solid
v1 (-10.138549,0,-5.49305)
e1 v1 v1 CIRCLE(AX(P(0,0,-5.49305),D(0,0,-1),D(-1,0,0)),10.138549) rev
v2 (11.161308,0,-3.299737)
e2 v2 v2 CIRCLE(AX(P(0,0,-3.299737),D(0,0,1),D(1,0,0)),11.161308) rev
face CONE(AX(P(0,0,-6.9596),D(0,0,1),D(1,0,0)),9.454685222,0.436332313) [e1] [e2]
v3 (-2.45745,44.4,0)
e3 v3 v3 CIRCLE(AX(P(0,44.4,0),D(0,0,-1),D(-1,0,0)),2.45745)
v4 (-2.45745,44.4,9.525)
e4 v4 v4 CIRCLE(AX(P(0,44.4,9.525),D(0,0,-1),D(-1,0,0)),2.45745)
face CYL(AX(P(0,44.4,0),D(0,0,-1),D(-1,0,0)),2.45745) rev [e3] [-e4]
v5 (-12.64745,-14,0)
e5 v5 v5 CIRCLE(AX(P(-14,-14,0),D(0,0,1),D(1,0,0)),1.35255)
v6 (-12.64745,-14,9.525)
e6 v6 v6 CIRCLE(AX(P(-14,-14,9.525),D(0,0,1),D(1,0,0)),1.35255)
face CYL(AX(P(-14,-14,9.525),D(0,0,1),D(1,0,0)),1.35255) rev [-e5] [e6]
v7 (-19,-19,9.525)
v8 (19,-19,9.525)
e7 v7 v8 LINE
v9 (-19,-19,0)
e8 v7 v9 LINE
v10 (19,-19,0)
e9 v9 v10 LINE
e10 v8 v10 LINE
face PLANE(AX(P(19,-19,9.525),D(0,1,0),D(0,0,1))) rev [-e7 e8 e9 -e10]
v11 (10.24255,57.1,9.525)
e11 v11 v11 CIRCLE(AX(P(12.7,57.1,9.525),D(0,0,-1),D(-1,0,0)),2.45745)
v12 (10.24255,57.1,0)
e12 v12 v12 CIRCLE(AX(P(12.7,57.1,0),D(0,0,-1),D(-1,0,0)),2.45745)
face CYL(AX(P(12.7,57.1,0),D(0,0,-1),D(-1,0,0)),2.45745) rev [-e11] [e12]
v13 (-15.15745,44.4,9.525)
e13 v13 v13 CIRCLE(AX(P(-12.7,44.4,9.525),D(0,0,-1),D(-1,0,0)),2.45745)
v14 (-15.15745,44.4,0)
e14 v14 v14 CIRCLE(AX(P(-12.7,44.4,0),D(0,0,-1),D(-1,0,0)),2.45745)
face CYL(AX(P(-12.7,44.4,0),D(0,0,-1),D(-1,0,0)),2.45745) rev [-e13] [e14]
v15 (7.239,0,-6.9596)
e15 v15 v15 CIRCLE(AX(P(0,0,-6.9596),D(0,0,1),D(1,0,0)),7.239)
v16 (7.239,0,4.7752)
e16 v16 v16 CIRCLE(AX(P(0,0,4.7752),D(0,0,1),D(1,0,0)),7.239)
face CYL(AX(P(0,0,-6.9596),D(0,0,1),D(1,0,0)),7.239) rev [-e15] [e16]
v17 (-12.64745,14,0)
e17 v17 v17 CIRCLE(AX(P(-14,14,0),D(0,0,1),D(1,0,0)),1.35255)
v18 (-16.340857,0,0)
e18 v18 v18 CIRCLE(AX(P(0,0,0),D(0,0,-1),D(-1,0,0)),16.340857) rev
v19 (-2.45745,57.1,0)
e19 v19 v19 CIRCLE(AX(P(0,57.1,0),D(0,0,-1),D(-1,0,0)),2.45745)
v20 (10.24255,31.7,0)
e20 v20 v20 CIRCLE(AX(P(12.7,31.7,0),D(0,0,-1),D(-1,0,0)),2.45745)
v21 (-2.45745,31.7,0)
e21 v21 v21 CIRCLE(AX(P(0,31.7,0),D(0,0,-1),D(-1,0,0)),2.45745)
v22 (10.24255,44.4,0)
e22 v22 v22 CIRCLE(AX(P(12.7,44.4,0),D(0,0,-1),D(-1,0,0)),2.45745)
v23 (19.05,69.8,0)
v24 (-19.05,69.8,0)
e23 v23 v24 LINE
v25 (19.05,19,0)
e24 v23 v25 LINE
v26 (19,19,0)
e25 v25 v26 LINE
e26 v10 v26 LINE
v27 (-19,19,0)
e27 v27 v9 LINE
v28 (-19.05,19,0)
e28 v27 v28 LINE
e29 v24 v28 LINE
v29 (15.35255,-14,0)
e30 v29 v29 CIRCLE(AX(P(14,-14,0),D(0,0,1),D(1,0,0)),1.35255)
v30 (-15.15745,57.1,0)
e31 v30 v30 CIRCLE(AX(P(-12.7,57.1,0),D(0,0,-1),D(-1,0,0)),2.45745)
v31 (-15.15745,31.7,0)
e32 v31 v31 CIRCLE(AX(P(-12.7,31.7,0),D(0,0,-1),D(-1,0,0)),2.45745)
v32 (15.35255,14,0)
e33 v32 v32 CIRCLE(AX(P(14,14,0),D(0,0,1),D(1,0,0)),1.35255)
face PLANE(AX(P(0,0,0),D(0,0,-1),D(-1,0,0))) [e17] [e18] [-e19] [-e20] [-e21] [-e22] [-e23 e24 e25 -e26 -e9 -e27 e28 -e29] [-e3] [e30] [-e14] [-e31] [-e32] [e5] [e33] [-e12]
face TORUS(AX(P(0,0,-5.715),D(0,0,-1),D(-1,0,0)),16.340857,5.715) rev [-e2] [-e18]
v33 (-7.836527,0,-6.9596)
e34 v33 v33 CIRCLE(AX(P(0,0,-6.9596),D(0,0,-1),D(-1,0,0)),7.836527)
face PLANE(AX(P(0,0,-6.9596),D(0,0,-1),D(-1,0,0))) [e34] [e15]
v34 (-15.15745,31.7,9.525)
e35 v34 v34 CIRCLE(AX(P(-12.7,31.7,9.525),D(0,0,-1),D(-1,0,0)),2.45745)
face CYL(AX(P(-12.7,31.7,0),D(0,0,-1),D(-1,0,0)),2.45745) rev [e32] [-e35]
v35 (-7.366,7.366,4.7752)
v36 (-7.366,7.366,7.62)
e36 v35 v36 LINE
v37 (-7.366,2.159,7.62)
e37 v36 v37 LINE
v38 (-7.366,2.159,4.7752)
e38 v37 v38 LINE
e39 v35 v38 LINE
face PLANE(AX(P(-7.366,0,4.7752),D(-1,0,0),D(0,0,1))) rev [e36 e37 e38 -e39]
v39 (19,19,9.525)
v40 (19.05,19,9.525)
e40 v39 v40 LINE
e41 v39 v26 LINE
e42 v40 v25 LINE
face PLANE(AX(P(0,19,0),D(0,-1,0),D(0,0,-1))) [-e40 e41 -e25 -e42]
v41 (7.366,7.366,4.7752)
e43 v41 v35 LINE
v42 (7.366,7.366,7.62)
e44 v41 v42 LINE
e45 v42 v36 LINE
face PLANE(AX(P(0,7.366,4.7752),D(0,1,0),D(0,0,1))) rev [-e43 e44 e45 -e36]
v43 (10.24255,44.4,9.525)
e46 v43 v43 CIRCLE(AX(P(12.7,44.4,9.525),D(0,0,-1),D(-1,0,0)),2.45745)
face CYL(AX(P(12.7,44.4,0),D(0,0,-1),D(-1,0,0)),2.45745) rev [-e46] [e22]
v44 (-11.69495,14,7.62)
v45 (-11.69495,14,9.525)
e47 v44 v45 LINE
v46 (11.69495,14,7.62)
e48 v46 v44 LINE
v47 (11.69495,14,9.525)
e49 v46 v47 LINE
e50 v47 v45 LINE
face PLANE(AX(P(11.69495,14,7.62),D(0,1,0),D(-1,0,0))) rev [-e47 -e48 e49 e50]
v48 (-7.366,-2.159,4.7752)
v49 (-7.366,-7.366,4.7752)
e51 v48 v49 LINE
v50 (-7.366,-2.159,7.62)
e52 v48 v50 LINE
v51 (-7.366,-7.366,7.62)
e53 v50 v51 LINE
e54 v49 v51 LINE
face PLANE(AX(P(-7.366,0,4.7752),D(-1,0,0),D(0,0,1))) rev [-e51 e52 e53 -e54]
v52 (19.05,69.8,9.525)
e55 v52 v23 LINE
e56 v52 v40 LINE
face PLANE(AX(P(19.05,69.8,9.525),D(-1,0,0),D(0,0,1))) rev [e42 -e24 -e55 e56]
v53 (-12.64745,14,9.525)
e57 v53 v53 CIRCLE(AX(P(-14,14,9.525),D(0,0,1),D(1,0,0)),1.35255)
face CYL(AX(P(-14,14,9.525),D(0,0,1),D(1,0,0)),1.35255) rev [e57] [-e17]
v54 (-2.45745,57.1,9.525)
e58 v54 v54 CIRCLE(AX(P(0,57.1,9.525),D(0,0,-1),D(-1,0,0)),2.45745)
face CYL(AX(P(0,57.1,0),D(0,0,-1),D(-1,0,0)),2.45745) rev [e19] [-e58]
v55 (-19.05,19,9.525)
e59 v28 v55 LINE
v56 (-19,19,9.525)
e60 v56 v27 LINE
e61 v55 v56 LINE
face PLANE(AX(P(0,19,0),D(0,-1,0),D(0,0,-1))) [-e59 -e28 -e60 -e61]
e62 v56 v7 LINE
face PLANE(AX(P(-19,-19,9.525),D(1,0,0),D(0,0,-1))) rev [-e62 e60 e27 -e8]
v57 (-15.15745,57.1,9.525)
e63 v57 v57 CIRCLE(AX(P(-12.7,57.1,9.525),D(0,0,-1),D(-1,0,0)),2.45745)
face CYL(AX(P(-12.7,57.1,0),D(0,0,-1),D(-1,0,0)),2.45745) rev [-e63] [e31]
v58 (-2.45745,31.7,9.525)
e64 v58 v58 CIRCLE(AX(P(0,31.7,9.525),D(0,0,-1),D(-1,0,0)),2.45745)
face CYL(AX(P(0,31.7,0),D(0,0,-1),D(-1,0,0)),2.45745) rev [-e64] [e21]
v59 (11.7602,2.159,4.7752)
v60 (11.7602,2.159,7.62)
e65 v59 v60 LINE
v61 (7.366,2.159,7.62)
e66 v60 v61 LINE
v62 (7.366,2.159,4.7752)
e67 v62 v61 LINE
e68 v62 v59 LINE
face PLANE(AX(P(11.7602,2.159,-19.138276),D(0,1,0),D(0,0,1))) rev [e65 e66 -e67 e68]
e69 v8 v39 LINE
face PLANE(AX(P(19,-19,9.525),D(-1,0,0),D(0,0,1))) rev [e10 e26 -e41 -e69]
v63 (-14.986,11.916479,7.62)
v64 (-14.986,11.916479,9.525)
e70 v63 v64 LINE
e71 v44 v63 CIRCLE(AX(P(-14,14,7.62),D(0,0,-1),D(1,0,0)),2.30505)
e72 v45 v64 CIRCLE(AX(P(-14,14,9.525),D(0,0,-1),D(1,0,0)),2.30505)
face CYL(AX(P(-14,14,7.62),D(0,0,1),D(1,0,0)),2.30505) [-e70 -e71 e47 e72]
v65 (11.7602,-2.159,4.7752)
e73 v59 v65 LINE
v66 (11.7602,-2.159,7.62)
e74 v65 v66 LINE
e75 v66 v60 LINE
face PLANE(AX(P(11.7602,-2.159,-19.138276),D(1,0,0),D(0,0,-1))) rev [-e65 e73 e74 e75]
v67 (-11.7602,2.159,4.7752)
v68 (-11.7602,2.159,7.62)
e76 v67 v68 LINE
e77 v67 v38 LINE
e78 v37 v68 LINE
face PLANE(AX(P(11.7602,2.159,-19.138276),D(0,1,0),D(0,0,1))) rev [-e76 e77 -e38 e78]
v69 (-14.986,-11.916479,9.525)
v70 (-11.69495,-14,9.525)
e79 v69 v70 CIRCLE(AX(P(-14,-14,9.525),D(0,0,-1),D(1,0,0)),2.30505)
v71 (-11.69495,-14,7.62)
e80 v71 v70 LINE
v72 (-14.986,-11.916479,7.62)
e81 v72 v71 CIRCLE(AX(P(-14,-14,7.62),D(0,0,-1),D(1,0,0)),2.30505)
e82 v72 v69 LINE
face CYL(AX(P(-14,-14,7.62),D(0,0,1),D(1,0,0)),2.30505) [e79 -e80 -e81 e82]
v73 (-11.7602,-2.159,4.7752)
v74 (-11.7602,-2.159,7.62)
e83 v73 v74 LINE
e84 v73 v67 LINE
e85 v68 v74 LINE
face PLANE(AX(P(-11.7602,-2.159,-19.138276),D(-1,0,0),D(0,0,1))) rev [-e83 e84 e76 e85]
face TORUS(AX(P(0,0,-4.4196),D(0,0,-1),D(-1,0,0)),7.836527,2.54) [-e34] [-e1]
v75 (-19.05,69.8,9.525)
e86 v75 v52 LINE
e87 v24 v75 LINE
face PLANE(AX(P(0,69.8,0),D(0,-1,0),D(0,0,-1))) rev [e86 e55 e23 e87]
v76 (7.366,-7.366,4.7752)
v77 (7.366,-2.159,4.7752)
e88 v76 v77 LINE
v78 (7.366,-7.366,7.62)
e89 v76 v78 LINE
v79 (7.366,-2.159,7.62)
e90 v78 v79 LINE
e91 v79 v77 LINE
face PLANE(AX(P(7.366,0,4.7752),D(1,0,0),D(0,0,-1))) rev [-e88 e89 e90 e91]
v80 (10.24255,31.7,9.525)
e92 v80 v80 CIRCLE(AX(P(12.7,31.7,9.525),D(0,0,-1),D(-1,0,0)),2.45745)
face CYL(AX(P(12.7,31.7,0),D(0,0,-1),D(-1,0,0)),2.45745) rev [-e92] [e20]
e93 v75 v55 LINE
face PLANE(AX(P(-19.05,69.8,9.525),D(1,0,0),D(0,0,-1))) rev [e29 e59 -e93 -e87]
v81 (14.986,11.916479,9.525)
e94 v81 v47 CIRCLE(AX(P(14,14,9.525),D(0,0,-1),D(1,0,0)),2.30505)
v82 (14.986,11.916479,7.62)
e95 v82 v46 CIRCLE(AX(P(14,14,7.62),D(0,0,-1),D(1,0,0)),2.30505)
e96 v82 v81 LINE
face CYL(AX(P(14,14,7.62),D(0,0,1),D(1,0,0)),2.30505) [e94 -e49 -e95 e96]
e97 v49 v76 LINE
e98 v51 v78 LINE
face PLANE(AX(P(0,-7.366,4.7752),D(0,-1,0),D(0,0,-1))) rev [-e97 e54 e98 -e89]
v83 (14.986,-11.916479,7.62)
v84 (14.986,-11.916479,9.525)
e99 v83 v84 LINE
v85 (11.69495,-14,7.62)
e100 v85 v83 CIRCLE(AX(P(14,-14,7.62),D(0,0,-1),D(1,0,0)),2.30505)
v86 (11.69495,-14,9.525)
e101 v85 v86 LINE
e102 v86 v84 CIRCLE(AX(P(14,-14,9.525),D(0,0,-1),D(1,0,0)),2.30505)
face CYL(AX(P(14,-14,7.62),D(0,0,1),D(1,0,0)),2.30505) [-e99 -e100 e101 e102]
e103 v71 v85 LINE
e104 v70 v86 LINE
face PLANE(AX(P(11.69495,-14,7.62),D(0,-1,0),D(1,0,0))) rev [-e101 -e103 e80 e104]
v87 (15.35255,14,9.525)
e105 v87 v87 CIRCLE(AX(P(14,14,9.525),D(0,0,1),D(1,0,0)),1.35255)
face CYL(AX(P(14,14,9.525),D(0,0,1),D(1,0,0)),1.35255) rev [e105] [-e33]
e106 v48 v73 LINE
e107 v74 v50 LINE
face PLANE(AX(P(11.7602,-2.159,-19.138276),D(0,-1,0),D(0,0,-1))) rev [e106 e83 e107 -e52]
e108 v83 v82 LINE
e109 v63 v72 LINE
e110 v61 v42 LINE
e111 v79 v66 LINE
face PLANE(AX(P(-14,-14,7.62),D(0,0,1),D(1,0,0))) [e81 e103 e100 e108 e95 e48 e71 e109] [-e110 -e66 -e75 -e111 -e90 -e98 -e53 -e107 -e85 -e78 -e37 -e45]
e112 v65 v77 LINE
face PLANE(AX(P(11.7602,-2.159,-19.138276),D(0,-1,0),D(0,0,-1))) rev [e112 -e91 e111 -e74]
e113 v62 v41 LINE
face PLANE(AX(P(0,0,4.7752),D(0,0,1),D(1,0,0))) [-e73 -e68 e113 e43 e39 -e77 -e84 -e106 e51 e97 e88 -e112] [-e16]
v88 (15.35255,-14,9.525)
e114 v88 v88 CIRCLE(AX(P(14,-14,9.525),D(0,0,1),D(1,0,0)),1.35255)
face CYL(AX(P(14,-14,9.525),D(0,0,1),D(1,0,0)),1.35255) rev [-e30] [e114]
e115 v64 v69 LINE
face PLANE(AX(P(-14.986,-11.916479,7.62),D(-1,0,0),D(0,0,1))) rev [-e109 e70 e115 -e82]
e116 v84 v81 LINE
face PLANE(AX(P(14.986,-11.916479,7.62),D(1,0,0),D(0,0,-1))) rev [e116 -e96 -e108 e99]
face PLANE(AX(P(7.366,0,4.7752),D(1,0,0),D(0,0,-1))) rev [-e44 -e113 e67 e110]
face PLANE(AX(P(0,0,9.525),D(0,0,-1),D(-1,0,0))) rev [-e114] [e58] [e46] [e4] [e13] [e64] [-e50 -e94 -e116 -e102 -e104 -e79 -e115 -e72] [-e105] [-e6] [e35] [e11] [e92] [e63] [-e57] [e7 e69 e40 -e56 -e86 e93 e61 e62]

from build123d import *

# Parameters (mm, degrees)
SKETCH1_W                    = 38
SKETCH1_H                    = 38
BOSS_EXTRUDE1_DEPTH          = 9.525
F_36_0_1065_DIAMETER_HOLE2_D = 2.7051
SKETCH8_W                    = 38.1
SKETCH8_H                    = 9.525
BOSS_EXTRUDE2_DEPTH          = 50.8
F_10_0_1935_DIAMETER_HOLE1_D = 4.9149
CUT_EXTRUDE2_DEPTH           = 1.905
CUT_EXTRUDE4_START           = 1.905
SKETCH13_W                   = 14.732
SKETCH13_H                   = 14.732
CUT_EXTRUDE4_DEPTH           = 4.7498
SKETCH14_W                   = 23.5204
SKETCH14_H                   = 4.318
CUT_EXTRUDE5_DEPTH           = 2.8448
SKETCH15_R                   = 12.7
BOSS_EXTRUDE3_DEPTH          = 6.9596
SKETCH12_R                   = 7.239
CUT_EXTRUDE3_DEPTH           = 74.807230243
CHAMFER1_SIZE2               = 3.245314778
CHAMFER1_SIZE                = 6.9596
FILLET4_R                    = 2.54
LPATTERN1_COUNT              = 3
LPATTERN1_PITCH              = 12.7


with BuildPart() as part:
    # Sketch1 → Boss-Extrude1 (new body)
    with BuildSketch(Plane(origin=(0, 0, 0), x_dir=(0, 1, 0), z_dir=(0, 0, 1))):
        Rectangle(SKETCH1_W, SKETCH1_H)
    extrude(amount=BOSS_EXTRUDE1_DEPTH)

    # #36 (0.1065) Diameter Hole2 (through all)
    with Locations(Plane.XY.offset(9.525)):
        with Locations((-14, -14), (14, -14), (14, 14), (-14, 14)):
            Hole(F_36_0_1065_DIAMETER_HOLE2_D / 2)

    # Sketch8 → Boss-Extrude2 (add)
    with BuildSketch(Plane(origin=(0, 19, 0), x_dir=(-1, 0, 0), z_dir=(0, 1, 0))):
        with Locations((0, 4.7625)):
            Rectangle(SKETCH8_W, SKETCH8_H)
    extrude(amount=BOSS_EXTRUDE2_DEPTH)

    # #10 (0.1935) Diameter Hole1 (through all)
    with Locations(Plane(origin=(0, 0, 0), x_dir=(1, 0, 0), z_dir=(0, 0, -1))):
        with Locations((-12.7, -57.1), (0, -57.1), (12.7, -57.1), (25.4, -57.1), (38.1, -57.1)):
            f_10_0_1935_diameter_hole1 = Hole(F_10_0_1935_DIAMETER_HOLE1_D / 2)

    # Sketch11 → Cut-Extrude2 (cut)
    with BuildSketch(Plane.XY.offset(9.525)):
        with BuildLine():
            Line((11.69495, -14), (-11.69495, -14))
            ThreePointArc((-11.69495, -14), (-12.76702064, -12.052432953), (-14.986, -11.916479061))
            Line((-14.986, -11.916479061), (-14.986, 11.916479061))
            ThreePointArc((-14.986, 11.916479061), (-12.76702064, 12.052432953), (-11.69495, 14))
            Line((-11.69495, 14), (11.69495, 14))
            ThreePointArc((11.69495, 14), (12.76702064, 12.052432953), (14.986, 11.916479061))
            Line((14.986, 11.916479061), (14.986, -11.916479061))
            ThreePointArc((14.986, -11.916479061), (12.76702064, -12.052432953), (11.69495, -14))
        make_face()
    extrude(amount=-CUT_EXTRUDE2_DEPTH, mode=Mode.SUBTRACT)

    # Sketch13 → Cut-Extrude4 (cut)
    with BuildSketch(Plane.XY.offset(7.62).offset(CUT_EXTRUDE4_START)):
        Rectangle(SKETCH13_W, SKETCH13_H)
    extrude(amount=-CUT_EXTRUDE4_DEPTH, mode=Mode.SUBTRACT)

    # Sketch14 → Cut-Extrude5 (cut)
    with BuildSketch(Plane.XY.offset(7.62)):
        Rectangle(SKETCH14_W, SKETCH14_H)
    extrude(amount=-CUT_EXTRUDE5_DEPTH, mode=Mode.SUBTRACT)

    # Sketch15 → Boss-Extrude3 (add)
    with BuildSketch(Plane(origin=(0, 0, 0), x_dir=(1, 0, 0), z_dir=(0, 0, -1))):
        with Locations(Location((0, 0, 0), (0, 0, 180))):
            Circle(SKETCH15_R)
    extrude(amount=BOSS_EXTRUDE3_DEPTH)

    # Sketch12 → Cut-Extrude3 (cut, through all)
    with BuildSketch(Plane.XY.offset(7.62)):
        Circle(SKETCH12_R)
    extrude(amount=-CUT_EXTRUDE3_DEPTH, mode=Mode.SUBTRACT)

    # Chamfer1
    chamfer1_edges = [part.edges().sort_by_distance(p)[0] for p in [
        (12.7, 0, -6.9596),
    ]]
    chamfer1_side = [part.faces().sort_by_distance(p)[0] for p in [
        (12.7, 0, -6.894693704),
    ]]
    chamfer(chamfer1_edges, length=CHAMFER1_SIZE - 0.0001, length2=CHAMFER1_SIZE2 - 0.0001, reference=chamfer1_side[0])  # a hair under: the kernel refuses the full size

    # Fillet3: read off the stored shape, not the designer's step
    # Fillet3 outline → Fillet3 (revolve)
    with BuildSketch(Plane.XZ):
        with BuildLine():
            Line((11.161307538, 0), (11.161307538, -3.299736634))
            ThreePointArc((11.161307538, -3.299736634), (13.270189279, -0.895017887), (16.340856541, 0))
            Line((16.340856541, 0), (11.161307538, 0))
        make_face()
    revolve(axis=Axis((0, 0, 0), (0, 0, 1)))

    # Fillet4
    fillet4_edges = [part.edges().sort_by_distance(p)[0] for p in [
        (9.454785222, 0, -6.9596),
    ]]
    fillet(fillet4_edges, radius=FILLET4_R)

    # LPattern1: #10 (0.1935) Diameter Hole1 ×3
    with Locations(*[(0, -i * LPATTERN1_PITCH, 0) for i in range(1, LPATTERN1_COUNT)]):
        add(f_10_0_1935_diameter_hole1, mode=Mode.SUBTRACT)


solid = part.part
